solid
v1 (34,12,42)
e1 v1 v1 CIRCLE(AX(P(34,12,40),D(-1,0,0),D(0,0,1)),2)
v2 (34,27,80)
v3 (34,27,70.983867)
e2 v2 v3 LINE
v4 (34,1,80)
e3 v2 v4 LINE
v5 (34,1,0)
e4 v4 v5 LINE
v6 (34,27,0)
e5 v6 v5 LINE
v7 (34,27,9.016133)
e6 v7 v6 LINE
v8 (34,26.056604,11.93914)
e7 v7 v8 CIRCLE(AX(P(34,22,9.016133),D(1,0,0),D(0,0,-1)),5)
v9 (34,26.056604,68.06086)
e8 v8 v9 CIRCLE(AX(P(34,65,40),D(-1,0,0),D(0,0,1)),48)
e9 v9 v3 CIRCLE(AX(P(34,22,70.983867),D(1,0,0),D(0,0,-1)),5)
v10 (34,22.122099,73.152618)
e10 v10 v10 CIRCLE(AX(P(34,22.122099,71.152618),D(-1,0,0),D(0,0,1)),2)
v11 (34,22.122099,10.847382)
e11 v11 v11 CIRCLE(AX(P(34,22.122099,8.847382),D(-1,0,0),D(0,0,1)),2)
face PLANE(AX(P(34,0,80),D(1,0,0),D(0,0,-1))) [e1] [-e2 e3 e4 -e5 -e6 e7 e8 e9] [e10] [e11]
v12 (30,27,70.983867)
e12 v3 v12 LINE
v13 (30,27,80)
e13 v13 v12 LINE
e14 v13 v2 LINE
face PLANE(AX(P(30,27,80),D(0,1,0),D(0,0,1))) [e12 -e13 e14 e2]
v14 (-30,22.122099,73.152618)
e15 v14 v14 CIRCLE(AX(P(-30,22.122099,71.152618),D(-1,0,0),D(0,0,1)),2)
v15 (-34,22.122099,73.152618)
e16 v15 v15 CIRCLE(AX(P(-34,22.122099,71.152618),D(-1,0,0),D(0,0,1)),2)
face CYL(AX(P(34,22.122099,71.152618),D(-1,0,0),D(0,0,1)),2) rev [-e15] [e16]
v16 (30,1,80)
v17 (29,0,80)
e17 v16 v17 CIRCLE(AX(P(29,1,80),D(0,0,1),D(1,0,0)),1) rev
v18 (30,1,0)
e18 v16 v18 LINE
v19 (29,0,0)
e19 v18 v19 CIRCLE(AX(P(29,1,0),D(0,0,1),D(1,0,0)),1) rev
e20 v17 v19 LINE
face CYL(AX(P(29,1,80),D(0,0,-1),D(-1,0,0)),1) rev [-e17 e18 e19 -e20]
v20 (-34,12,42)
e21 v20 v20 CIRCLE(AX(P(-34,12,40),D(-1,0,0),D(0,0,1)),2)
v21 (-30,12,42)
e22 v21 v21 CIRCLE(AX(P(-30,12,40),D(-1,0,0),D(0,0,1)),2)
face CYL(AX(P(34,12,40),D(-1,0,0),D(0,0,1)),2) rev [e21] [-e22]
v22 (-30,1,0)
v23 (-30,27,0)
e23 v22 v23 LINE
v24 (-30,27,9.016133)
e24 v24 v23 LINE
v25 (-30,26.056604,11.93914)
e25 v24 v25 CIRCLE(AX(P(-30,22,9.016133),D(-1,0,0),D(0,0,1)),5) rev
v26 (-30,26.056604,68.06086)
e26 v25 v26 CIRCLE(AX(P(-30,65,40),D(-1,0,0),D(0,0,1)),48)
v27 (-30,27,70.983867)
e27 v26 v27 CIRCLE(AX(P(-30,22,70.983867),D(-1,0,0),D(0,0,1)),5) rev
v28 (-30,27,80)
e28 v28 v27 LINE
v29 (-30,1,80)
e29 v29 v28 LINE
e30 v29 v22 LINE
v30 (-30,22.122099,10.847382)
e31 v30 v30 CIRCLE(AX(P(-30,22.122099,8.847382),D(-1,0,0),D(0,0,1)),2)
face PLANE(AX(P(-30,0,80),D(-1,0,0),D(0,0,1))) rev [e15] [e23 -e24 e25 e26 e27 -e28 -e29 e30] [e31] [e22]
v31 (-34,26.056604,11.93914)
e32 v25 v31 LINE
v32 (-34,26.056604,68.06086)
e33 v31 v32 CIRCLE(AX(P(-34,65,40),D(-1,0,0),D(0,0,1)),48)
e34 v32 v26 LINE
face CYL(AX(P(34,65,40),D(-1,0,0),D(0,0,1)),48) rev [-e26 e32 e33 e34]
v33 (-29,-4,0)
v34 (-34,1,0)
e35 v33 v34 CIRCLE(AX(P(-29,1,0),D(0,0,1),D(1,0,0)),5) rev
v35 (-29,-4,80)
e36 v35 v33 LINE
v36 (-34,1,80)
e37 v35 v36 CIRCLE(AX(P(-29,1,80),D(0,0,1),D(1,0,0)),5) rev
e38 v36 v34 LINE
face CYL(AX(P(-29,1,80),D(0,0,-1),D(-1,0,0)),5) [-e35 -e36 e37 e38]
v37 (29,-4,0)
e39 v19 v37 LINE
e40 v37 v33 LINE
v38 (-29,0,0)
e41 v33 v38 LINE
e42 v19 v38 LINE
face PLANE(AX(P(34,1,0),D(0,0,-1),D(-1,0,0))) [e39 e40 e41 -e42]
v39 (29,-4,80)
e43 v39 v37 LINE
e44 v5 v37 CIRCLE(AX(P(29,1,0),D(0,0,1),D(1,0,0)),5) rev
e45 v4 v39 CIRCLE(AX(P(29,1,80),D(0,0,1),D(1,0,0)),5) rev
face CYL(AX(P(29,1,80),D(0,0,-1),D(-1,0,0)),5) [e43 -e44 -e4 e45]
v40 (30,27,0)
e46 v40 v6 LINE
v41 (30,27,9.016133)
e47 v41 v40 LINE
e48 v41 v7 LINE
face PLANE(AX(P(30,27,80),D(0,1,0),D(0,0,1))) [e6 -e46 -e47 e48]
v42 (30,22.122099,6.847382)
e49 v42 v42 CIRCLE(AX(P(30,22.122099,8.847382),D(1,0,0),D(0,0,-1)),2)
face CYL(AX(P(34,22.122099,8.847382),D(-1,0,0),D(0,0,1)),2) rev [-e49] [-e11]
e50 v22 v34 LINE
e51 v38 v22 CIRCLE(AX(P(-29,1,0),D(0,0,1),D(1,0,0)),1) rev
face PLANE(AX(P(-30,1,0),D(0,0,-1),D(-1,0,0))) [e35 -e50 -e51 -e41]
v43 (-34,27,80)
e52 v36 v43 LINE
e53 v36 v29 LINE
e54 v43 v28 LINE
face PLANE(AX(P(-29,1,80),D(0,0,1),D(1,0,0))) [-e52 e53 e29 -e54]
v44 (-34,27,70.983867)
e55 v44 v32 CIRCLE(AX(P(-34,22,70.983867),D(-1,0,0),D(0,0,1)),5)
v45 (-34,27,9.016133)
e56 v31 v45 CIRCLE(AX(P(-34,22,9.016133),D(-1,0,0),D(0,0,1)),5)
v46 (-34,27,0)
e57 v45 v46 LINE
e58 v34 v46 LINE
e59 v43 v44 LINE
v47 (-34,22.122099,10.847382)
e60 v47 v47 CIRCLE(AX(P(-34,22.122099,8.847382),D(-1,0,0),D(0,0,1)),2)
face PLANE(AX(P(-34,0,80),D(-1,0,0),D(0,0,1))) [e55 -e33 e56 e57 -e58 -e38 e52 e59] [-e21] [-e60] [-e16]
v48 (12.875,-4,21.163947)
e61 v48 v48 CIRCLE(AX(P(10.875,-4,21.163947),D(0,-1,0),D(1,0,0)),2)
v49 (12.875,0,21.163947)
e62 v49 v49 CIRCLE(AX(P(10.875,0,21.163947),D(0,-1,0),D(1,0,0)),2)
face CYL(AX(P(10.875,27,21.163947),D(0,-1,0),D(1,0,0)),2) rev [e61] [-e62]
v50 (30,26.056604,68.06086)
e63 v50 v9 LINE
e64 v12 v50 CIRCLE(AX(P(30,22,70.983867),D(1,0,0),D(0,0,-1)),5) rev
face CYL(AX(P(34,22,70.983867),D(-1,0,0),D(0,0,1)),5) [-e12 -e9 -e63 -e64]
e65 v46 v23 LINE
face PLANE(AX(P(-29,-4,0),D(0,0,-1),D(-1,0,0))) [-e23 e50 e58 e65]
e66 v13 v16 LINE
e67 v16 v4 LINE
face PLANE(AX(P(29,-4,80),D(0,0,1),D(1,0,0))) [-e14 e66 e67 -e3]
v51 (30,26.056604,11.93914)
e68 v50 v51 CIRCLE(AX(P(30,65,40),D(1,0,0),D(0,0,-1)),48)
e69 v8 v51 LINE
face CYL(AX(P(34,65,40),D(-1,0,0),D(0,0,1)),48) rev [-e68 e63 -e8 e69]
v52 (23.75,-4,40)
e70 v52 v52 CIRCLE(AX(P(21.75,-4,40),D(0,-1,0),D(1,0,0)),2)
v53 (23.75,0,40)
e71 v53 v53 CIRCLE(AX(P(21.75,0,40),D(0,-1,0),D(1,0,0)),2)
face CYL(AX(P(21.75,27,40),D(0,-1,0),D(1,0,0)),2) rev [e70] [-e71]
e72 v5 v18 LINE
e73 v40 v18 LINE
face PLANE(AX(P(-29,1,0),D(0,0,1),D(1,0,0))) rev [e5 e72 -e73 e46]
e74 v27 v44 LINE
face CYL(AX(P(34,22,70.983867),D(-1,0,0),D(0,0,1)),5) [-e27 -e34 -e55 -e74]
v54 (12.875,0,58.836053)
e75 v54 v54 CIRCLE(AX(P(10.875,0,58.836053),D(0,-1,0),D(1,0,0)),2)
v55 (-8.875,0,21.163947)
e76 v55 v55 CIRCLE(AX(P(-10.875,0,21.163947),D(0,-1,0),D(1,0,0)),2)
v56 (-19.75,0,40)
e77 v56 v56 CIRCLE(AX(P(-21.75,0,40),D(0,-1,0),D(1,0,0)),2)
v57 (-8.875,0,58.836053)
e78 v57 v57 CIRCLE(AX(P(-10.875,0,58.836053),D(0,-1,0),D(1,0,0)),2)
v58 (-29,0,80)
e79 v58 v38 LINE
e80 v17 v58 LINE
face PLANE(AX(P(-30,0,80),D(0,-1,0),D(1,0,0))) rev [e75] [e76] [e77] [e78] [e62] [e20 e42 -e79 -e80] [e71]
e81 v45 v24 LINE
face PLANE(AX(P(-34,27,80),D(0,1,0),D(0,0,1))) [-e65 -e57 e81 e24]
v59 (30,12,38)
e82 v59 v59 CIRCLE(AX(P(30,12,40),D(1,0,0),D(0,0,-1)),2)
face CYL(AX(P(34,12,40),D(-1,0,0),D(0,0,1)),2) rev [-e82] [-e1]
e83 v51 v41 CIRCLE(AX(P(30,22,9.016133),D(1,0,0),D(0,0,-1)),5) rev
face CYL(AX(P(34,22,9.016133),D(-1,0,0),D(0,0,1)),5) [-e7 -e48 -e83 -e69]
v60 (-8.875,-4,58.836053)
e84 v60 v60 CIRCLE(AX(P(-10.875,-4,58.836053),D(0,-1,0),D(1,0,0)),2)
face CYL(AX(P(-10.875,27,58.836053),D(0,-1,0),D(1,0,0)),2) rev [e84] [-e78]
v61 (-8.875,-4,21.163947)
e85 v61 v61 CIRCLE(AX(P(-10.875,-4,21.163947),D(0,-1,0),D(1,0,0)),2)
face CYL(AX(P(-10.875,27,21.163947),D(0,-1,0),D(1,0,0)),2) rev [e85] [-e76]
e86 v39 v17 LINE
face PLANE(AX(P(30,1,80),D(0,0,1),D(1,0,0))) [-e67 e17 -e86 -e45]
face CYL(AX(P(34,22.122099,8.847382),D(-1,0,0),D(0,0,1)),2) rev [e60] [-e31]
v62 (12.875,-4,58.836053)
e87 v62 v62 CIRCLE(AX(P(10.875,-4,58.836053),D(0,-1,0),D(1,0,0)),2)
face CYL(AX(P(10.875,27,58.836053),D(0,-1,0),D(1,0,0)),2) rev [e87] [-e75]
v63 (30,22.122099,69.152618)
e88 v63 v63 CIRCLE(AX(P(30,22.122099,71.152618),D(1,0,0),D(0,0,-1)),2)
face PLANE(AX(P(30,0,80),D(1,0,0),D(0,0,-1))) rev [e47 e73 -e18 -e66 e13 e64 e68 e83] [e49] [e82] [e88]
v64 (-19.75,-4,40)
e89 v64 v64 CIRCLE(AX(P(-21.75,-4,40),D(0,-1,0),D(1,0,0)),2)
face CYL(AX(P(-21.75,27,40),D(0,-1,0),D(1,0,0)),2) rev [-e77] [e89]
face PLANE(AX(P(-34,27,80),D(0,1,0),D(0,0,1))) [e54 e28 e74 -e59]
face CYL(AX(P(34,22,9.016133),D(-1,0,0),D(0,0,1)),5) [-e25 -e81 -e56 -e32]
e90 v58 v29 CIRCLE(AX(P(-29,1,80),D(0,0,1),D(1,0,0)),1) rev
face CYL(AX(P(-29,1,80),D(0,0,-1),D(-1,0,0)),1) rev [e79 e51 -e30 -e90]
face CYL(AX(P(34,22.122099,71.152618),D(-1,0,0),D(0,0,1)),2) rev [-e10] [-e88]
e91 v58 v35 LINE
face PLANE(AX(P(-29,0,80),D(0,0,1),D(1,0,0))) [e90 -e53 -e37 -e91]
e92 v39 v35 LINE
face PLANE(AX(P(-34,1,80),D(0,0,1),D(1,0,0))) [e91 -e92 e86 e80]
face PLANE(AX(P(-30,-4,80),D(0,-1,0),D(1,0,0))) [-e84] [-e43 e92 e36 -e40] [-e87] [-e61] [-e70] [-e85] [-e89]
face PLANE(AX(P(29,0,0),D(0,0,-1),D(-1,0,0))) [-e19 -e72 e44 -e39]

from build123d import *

# Parameters (mm, degrees)
SM_BASE_FLANGE_1_DEPTH   = 80
CUT_EXTRUDE_3_DEPTH      = 109.411254028
CUT_EXTRUDE_3_DEPTH_BACK = 109.411254028
SKETCH_6_R               = 48
SKETCH_6_R_2             = 2
FILLET_1_R               = 5
SKETCH_9_R               = 2
CUT_EXTRUDE_4_DEPTH      = 93.287593966


# Sheet-metal steps are written as plain solids
with BuildPart() as part:
    # Sketch 1 → Базовая кромка1 (new body)
    with BuildSketch(Plane.XY):
        with BuildLine():
            Line((-30, 27), (-30, 1))
            ThreePointArc((-30, 1), (-29.707106781, 0.292893219), (-29, 0))
            Line((-29, 0), (29, 0))
            ThreePointArc((29, 0), (29.707106781, 0.292893219), (30, 1))
            Line((30, 1), (30, 27))
            Line((30, 27), (34, 27))
            Line((34, 27), (34, 1))
            ThreePointArc((34, 1), (32.535533906, -2.535533906), (29, -4))
            Line((29, -4), (-29, -4))
            ThreePointArc((-29, -4), (-32.535533906, -2.535533906), (-34, 1))
            Line((-34, 1), (-34, 27))
            Line((-34, 27), (-30, 27))
        make_face()
    extrude(amount=SM_BASE_FLANGE_1_DEPTH)

    # Эскиз6 → Вырез-Вытянуть3 (cut, two sides: drawn at the far end of the back side and taken through both)
    with BuildSketch(Plane.ZY.offset(34).offset(-CUT_EXTRUDE_3_DEPTH_BACK)):
        with Locations((40, 65)):
            Circle(SKETCH_6_R)
        with Locations((40, 12)):
            Circle(SKETCH_6_R_2)
        with Locations((8.847381628, 22.122099298)):
            Circle(SKETCH_6_R_2)
        with Locations((71.152618372, 22.122099298)):
            Circle(SKETCH_6_R_2)
    extrude(amount=CUT_EXTRUDE_3_DEPTH + CUT_EXTRUDE_3_DEPTH_BACK, mode=Mode.SUBTRACT)

    # Скругление1
    fillet_1_edges = [part.edges().sort_by_distance(p)[0] for p in [
        (32, 27, 10.674243403),
        (32, 27, 69.325756597),
        (-32, 27, 10.674243403),
        (-32, 27, 69.325756597),
    ]]
    fillet(fillet_1_edges, radius=FILLET_1_R)

    # Эскиз9 → Вырез-Вытянуть4 (cut, through all)
    with BuildSketch(Plane.XZ.offset(4)):
        with Locations((-21.75, 40)):
            Circle(SKETCH_9_R)
        with Locations((-10.875, 58.836052532)):
            Circle(SKETCH_9_R)
        with Locations((10.875, 58.836052532)):
            Circle(SKETCH_9_R)
        with Locations((21.75, 40)):
            Circle(SKETCH_9_R)
        with Locations((10.875, 21.163947468)):
            Circle(SKETCH_9_R)
        with Locations((-10.875, 21.163947468)):
            Circle(SKETCH_9_R)
    extrude(amount=-CUT_EXTRUDE_4_DEPTH, mode=Mode.SUBTRACT)


solid = part.part
